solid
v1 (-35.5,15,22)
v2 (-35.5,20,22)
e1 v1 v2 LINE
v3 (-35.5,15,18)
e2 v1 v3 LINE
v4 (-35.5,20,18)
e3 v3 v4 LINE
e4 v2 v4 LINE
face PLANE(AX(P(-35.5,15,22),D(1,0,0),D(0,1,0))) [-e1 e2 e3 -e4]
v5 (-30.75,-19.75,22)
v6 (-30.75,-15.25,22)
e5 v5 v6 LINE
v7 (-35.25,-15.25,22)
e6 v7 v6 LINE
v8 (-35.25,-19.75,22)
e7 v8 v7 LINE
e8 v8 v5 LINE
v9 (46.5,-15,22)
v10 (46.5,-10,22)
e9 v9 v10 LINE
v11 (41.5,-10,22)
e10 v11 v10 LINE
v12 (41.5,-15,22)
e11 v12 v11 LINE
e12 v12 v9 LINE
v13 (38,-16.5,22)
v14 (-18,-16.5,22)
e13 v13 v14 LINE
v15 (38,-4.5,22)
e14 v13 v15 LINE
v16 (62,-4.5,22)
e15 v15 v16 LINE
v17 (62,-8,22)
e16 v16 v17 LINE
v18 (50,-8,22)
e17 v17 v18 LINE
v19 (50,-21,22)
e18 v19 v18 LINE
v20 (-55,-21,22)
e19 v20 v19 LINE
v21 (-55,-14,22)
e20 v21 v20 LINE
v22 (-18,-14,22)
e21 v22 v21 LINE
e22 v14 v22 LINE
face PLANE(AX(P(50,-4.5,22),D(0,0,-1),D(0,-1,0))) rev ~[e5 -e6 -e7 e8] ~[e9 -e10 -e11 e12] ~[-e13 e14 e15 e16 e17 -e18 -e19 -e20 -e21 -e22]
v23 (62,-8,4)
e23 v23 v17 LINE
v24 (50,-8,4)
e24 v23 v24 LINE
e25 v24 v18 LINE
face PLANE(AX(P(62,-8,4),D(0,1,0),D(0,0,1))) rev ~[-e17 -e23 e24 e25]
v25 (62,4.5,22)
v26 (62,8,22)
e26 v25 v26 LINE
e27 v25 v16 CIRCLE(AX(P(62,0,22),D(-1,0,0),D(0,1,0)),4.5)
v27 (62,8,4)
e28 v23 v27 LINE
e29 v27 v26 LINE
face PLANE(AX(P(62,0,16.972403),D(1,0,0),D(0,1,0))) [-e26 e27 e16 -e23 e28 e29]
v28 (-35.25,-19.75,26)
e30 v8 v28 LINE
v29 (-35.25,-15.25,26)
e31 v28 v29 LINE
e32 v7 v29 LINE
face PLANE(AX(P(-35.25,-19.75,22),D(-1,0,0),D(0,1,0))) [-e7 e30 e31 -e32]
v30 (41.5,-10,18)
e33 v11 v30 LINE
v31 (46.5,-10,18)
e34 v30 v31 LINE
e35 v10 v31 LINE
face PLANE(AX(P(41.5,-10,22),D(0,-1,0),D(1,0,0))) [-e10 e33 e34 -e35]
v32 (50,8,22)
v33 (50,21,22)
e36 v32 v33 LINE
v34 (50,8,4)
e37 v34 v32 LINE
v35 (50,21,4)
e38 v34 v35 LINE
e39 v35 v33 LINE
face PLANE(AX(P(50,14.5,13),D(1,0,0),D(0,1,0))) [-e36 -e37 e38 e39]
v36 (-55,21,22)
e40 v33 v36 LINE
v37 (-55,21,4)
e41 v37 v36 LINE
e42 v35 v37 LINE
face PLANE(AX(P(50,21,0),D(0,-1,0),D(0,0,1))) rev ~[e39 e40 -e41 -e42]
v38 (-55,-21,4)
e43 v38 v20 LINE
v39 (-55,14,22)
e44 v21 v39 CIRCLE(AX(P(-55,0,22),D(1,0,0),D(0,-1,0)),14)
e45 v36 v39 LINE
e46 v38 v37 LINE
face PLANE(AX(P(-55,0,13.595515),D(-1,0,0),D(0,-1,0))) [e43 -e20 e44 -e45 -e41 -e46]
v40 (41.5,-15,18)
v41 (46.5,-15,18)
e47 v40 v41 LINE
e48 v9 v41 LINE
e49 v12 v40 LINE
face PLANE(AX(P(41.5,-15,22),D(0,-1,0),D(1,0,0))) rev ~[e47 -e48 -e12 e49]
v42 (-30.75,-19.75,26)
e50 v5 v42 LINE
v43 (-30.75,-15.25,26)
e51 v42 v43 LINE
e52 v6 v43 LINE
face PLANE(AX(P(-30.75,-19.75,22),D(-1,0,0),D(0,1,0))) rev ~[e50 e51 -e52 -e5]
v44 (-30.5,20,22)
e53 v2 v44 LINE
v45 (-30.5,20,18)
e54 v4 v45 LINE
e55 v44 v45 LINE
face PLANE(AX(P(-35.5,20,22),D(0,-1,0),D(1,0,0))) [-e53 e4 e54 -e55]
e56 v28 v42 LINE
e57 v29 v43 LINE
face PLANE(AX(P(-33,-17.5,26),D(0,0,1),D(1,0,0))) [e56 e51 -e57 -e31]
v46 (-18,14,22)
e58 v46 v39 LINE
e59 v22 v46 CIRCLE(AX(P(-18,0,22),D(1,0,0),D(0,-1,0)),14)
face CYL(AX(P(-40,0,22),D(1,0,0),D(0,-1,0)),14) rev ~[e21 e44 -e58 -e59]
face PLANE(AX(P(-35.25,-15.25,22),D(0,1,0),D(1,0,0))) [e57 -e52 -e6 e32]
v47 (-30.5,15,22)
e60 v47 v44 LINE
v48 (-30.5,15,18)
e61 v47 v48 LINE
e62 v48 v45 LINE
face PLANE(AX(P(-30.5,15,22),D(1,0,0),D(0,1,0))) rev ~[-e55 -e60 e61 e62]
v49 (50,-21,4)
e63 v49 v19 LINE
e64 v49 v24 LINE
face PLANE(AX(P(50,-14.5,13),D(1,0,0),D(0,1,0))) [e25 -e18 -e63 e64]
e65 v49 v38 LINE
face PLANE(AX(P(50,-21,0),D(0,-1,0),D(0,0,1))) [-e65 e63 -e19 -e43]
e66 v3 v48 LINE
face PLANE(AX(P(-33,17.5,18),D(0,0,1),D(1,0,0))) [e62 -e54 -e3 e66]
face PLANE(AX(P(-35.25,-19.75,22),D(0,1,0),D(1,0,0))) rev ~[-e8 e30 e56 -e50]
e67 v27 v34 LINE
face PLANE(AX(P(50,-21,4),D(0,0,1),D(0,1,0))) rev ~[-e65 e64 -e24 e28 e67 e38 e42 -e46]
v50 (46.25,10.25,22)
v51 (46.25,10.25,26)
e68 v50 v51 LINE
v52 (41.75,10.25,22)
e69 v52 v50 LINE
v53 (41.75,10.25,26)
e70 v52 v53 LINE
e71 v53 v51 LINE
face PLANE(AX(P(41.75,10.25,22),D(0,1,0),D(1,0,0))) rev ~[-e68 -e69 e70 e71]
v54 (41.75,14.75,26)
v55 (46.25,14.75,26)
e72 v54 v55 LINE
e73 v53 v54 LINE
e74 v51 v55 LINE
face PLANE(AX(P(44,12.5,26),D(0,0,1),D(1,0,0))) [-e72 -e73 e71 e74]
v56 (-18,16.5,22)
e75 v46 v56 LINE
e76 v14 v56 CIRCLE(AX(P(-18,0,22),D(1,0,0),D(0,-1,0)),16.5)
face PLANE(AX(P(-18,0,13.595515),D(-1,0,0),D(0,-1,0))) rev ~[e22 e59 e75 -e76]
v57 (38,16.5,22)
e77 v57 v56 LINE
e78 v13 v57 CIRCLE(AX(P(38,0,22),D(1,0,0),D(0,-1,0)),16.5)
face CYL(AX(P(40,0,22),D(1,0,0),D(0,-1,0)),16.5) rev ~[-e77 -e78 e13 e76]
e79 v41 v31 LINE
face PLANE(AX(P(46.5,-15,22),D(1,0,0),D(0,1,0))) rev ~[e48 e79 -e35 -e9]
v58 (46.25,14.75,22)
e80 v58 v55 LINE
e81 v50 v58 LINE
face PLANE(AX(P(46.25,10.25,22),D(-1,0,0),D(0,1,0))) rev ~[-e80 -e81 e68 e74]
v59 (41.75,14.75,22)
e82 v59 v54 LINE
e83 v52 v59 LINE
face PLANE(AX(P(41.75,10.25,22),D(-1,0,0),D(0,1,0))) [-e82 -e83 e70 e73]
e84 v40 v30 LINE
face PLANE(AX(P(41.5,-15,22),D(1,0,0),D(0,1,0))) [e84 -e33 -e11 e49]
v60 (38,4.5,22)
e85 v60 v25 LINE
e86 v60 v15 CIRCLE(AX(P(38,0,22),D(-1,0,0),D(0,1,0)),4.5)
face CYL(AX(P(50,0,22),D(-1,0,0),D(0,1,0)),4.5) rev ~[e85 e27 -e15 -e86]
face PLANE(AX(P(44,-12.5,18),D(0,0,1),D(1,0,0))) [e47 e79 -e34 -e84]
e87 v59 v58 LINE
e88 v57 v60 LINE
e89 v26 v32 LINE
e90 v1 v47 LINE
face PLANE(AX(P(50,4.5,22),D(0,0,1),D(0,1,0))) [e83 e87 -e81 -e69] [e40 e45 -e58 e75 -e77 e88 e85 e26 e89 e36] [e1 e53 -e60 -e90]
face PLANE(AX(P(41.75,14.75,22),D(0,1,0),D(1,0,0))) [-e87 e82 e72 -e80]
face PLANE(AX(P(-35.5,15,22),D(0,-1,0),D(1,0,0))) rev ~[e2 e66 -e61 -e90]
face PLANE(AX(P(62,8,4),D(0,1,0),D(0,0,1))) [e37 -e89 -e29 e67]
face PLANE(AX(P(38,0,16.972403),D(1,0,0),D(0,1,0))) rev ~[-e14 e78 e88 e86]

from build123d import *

# Parameters (mm, degrees)
F0_W      = 80
F0_H      = 42
F1_DEPTH  = 22
F3_DEPTH  = 80
F4_DEPTH  = 2
F6_DEPTH  = 22
F7_DEPTH  = 28
F8_DEPTH  = 15
F9_DEPTH  = 2
F10_DEPTH = 10
F11_W     = 5
F11_H     = 5
F12_DEPTH = 4
F11_W_2   = 4.5
F11_H_2   = 4.5
F13_DEPTH = 4
F14_DEPTH = 12
F15_DEPTH = 4
F16_W     = 13
F16_H     = 18
F17_DEPTH = 12


# Not quite as in the source:
# - a feature names something its author has since deleted; it is built from what else it names


with BuildPart() as f1:
    # F0 (on Top) → F1 (new body)
    with BuildSketch(Plane.XY):
        Rectangle(F0_W, F0_H)
    extrude(amount=F1_DEPTH)

    # F2 (on face) → F3 (cut)
    with BuildSketch(Plane.YZ.offset(40)):
        with BuildLine():
            ThreePointArc((-16.5, 22), (0, 5.5), (16.5, 22))
            Line((16.5, 22), (14, 22))
            ThreePointArc((14, 22), (0, 8), (-14, 22))
            Line((-14, 22), (-16.5, 22))
        make_face()
        with BuildLine():
            ThreePointArc((-14, 22), (0, 8), (14, 22))
            Line((14, 22), (4.5, 22))
            ThreePointArc((4.5, 22), (0, 17.5), (-4.5, 22))
            Line((-4.5, 22), (-14, 22))
        make_face()
        with BuildLine():
            ThreePointArc((-4.5, 22), (0, 17.5), (4.5, 22))
            Line((4.5, 22), (-4.5, 22))
        make_face()
    extrude(amount=-F3_DEPTH, mode=Mode.SUBTRACT)

    # F2 (on face) → F4 (join)
    with BuildSketch(Plane.YZ.offset(40)):
        with BuildLine():
            ThreePointArc((-16.5, 22), (0, 5.5), (16.5, 22))
            Line((16.5, 22), (14, 22))
            ThreePointArc((14, 22), (0, 8), (-14, 22))
            Line((-14, 22), (-16.5, 22))
        make_face()
    extrude(amount=-F4_DEPTH)



with BuildPart() as f6:
    # F5 (on face) → F6 (new body)
    with BuildSketch(Plane(origin=(-40, 0, 0), x_dir=(0, -1, 0), z_dir=(-1, 0, 0))):
        with BuildLine():
            Line((-14, 22), (14, 22))
            ThreePointArc((14, 22), (0, 36), (-14, 22))
        make_face()
    extrude(amount=-F6_DEPTH)


with BuildPart() as f1_1:
    add(f1.part)

    add(f6.part)  # F6#2 merges F6
    # F5 (on face) → F6, piece 2 (join)
    with BuildSketch(Plane(origin=(-40, 0, 0), x_dir=(0, -1, 0), z_dir=(-1, 0, 0))):
        with BuildLine():
            Line((16.5, 22), (14, 22))
            ThreePointArc((14, 22), (0, 8), (-14, 22))
            Line((-14, 22), (-16.5, 22))
            ThreePointArc((-16.5, 22), (0, 5.5), (16.5, 22))
        make_face()
        with BuildLine():
            Line((21, 22), (16.5, 22))
            ThreePointArc((16.5, 22), (0, 5.5), (-16.5, 22))
            Line((-16.5, 22), (-21, 22))
            Line((-21, 22), (-21, 0))
            Line((-21, 0), (21, 0))
            Line((21, 0), (21, 22))
        make_face()
    extrude(amount=-F6_DEPTH)

    # F5 (on face) → F7 (cut)
    with BuildSketch(Plane(origin=(-40, 0, 0), x_dir=(0, -1, 0), z_dir=(-1, 0, 0))):
        with BuildLine():
            Line((-14, 22), (14, 22))
            ThreePointArc((14, 22), (0, 36), (-14, 22))
        make_face()
    extrude(amount=-F7_DEPTH, mode=Mode.SUBTRACT)

    # F8 (add): a face of the model
    f8_faces = [f1_1.faces().sort_by_distance(p)[0] for p in [
        (-40, 0, 0.4741307836),
    ]]
    extrude(f8_faces, amount=F8_DEPTH)

    # F2 (on face) → F9 (join)
    with BuildSketch(Plane.YZ.offset(40)):
        with BuildLine():
            ThreePointArc((-14, 22), (0, 8), (14, 22))
            Line((14, 22), (4.5, 22))
            ThreePointArc((4.5, 22), (0, 17.5), (-4.5, 22))
            Line((-4.5, 22), (-14, 22))
        make_face()
    extrude(amount=-F9_DEPTH)

    # F10 (add): a face of the model
    f10_faces = [f1_1.faces().sort_by_distance(p)[0] for p in [
        (40, 0, 10.6759160757),
    ]]
    extrude(f10_faces, amount=F10_DEPTH)

    # F11 (on face) → F12 (cut)
    with BuildSketch(Plane.XY.offset(22)):
        with Locations((-33, 17.5)):
            Rectangle(F11_W, F11_H)
        with Locations((44, -12.5)):
            Rectangle(F11_W, F11_H)
    extrude(amount=-F12_DEPTH, mode=Mode.SUBTRACT)

    # F11 (on face) → F13 (join)
    with BuildSketch(Plane.XY.offset(22)):
        with Locations((-33, -17.5)):
            Rectangle(F11_W_2, F11_H_2)
        with Locations((44, 12.5)):
            Rectangle(F11_W_2, F11_H_2)
    extrude(amount=F13_DEPTH)

    # F14 (add): a face of the model
    f14_faces = [f1_1.faces().sort_by_distance(p)[0] for p in [
        (50, 0, 10.6759160757),
    ]]
    extrude(f14_faces, amount=F14_DEPTH)

    # F15 (cut): a face of the model
    f15_faces = [f1_1.faces().sort_by_distance(p)[0] for p in [
        (3.5, 0, 0),
    ]]
    extrude(f15_faces, amount=-F15_DEPTH, mode=Mode.SUBTRACT)

    # F16 (on face) → F17 (cut)
    with BuildSketch(Plane.YZ.offset(62)):
        with Locations((-14.5, 13)):
            Rectangle(F16_W, F16_H)
        with Locations((14.5, 13)):
            Rectangle(F16_W, F16_H)
    extrude(amount=-F17_DEPTH, mode=Mode.SUBTRACT)


solid = f1_1.part
